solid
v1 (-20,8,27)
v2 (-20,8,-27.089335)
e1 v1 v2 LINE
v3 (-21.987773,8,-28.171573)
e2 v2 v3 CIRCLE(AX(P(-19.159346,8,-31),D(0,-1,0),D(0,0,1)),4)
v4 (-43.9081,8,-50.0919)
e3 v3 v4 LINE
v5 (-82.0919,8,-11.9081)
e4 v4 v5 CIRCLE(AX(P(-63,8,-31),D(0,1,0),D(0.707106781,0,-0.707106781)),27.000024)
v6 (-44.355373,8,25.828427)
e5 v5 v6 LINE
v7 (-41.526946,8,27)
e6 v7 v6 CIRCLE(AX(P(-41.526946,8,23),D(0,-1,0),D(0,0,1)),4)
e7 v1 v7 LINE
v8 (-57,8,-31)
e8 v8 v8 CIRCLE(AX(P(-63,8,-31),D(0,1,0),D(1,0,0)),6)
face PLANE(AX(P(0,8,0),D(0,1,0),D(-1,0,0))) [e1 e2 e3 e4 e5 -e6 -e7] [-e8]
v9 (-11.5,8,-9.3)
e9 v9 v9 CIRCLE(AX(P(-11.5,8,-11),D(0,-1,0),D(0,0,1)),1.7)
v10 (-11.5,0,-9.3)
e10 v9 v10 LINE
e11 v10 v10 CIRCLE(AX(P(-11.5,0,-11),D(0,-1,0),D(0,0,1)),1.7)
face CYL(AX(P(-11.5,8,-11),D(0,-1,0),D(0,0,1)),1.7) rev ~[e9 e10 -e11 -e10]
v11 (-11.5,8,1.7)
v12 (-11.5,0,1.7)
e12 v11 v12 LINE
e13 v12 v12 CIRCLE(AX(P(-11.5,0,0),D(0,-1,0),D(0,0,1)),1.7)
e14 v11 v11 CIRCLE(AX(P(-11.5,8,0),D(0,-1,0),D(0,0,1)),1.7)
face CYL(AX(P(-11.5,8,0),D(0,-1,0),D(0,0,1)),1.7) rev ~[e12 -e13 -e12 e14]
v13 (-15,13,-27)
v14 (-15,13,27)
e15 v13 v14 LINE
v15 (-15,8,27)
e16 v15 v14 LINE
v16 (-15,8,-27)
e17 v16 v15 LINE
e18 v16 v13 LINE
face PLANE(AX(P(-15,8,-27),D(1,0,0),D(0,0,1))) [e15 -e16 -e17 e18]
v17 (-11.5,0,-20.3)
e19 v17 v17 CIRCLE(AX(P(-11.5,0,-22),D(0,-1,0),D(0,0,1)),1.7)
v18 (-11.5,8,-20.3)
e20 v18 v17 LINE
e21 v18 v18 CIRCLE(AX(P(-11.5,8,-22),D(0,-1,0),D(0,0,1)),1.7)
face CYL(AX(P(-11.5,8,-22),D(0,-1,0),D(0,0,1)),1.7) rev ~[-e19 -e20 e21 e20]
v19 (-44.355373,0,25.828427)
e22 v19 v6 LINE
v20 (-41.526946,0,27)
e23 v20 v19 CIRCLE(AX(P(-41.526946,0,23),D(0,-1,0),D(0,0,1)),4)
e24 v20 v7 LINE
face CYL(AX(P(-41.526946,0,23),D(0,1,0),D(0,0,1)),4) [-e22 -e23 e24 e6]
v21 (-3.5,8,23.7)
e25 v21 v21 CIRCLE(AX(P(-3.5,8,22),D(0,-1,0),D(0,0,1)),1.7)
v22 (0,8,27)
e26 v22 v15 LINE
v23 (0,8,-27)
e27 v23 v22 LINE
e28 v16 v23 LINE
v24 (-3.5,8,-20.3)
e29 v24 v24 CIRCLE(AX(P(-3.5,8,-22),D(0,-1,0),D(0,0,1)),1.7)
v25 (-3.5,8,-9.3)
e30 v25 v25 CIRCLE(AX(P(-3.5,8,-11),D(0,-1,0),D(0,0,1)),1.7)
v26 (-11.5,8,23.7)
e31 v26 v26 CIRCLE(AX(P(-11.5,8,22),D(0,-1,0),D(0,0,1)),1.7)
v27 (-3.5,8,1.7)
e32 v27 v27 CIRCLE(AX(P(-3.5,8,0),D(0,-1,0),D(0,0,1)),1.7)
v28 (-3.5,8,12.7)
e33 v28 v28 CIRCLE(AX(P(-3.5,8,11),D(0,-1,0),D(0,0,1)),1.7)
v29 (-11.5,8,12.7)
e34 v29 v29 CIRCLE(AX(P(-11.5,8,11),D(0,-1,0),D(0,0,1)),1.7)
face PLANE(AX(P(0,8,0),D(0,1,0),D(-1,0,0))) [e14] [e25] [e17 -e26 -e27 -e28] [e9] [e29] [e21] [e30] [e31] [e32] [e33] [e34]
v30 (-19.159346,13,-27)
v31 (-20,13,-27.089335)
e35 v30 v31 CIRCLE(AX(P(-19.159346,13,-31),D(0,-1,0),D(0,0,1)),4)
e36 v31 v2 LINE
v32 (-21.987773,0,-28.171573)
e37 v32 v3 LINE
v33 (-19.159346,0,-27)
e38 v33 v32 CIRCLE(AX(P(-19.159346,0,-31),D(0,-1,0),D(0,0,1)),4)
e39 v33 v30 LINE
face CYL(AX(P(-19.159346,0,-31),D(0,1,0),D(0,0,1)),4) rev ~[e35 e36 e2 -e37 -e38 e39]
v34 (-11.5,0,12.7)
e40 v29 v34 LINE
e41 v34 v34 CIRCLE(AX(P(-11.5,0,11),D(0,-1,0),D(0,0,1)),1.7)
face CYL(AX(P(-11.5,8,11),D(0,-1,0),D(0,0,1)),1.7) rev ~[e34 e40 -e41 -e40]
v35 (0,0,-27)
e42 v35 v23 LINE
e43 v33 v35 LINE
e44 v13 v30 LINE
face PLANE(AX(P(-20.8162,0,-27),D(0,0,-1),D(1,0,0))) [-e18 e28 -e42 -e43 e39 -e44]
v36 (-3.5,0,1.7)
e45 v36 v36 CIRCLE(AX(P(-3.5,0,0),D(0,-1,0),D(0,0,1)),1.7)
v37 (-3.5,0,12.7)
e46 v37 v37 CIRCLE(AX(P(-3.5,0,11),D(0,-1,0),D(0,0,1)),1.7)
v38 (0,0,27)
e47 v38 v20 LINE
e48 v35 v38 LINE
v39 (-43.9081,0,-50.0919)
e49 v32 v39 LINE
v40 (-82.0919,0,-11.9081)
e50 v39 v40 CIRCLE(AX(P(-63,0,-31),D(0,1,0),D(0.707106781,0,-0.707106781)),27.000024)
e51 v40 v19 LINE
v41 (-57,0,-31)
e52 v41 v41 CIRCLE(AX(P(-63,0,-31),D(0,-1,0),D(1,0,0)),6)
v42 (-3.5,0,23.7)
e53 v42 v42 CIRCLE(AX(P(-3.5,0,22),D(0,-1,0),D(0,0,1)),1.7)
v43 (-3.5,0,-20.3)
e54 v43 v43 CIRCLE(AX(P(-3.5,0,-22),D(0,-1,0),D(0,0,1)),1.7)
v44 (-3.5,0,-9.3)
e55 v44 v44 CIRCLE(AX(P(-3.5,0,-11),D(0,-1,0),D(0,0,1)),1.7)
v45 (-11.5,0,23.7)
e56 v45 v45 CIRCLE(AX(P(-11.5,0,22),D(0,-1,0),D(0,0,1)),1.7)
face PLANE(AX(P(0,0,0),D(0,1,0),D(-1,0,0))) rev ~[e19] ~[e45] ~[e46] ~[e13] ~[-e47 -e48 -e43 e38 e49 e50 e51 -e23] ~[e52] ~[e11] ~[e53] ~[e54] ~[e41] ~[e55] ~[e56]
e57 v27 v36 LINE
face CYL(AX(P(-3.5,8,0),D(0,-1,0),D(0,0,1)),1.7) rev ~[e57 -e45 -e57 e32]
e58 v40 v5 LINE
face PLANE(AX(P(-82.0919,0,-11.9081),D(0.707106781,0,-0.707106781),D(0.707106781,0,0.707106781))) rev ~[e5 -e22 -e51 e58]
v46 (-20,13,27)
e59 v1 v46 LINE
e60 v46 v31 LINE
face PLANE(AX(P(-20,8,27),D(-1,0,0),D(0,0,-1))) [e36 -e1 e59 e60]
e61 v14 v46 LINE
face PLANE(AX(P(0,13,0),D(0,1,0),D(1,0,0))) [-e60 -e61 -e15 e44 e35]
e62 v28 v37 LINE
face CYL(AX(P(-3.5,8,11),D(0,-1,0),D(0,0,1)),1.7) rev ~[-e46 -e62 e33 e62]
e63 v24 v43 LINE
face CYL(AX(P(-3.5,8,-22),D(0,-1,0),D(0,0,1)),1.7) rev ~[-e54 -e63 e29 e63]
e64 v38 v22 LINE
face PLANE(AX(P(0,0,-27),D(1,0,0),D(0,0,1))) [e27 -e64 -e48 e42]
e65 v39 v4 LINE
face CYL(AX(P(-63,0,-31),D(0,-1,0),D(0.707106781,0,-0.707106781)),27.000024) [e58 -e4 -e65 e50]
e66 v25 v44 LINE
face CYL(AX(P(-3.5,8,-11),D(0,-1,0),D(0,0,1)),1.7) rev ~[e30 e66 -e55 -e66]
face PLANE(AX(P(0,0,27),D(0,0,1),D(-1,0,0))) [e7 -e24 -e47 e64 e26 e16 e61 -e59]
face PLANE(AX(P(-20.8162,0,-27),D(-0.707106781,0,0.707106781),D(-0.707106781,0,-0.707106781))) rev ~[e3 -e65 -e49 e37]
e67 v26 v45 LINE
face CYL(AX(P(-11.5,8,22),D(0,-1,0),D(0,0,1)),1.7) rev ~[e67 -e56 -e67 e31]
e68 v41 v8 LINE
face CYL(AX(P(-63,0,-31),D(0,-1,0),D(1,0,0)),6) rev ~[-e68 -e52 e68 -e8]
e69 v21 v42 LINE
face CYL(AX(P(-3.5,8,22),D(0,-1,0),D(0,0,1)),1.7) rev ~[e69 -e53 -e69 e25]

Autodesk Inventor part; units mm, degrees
ref_plane "YZ Plane" through (0, 0, 0) normal (1, 0, 0) x (0, 1, 0)
ref_plane "XZ Plane" through (0, 0, 0) normal (0, 1, 0) x (-1, 0, 0)
ref_plane "XY Plane" through (0, 0, 0) normal (0, 0, 1) x (1, 0, 0)
sketch "Skizze1" plane through (0, 0, 0) normal (0, 1, 0) x (-1, 0, 0)
  line L0 (20.8162, -27) -> (0, -27)
  line L1 (0, -27) -> (0, 27)
  line L2 (20.8162, -27) -> (43.9081, -50.0919)
  arc A0 (43.9081, -50.0919) -> (82.0919, -11.9081) centre (63, -31) ccw
  line L3 (82.0919, -11.9081) -> (43.1838, 27)
  line L4 (0, 27) -> (43.1838, 27)
  point P0 (0, 0)
  dimension "d0" = 54
  dimension "d40" = 135
  dimension "d42" = 54
  dimension "d43" = 31
  dimension "d47" = 63
extrude "Extrusion1" add sketch "Skizze1" along normal blind 8
sketch "Skizze3" plane through (0, 8, 0) normal (0, 1, 0) x (1, 0, 0)
  line L0 (0, 0) -> (-17.1865, 0) construction
  line L1 (0, -27) -> (0, 27) construction
  line L2 (0, -27) -> (0, 27) construction
  line L3 (0, 27) -> (-20.8162, 27) construction
  line L4 (-18, -27) -> (0, -27) construction
  line L5 (0, 27) -> (-20.8162, 27) construction
  line L6 (-20.8162, 27) -> (-43.9081, 50.0919) projected
  arc A0 (-43.9081, 50.0919) -> (-82.0919, 11.9081) centre (-63, 31) ccw projected
  line L7 (-82.0919, 11.9081) -> (-43.1838, -27) projected
  line L8 (-43.1838, -27) -> (0, -27) projected
  arc A1 (-43.9081, 50.0919) -> (-82.0919, 11.9081) centre (-63, 31) ccw projected
  circle A2 centre (-63, 31) radius 6
  point P0 (-18, 27)
  dimension "d48" = 12
extrude "Extrusion3" [suppressed]
sketch "Skizze5" plane through (0, 8, 0) normal (0, 1, 0) x (1, 0, 0)
  line L0 (0, -27) -> (0, 27) projected
  line L1 (0, 27) -> (-20.8162, 27) projected
  line L2 (-15, -27) -> (-20, -27)
  line L3 (-20, -27) -> (-20, 27)
  line L4 (-20, 27) -> (-15, 27)
  line L5 (-15, 27) -> (-15, -27)
  line L6 (-82.0919, 11.9081) -> (-43.1838, -27) projected
  line L7 (-43.1838, -27) -> (0, -27) projected
  line L8 (-20.8162, 27) -> (-43.9081, 50.0919) projected
  arc A0 (-43.9081, 50.0919) -> (-82.0919, 11.9081) centre (-63, 31) ccw projected
  point P0 (0, 0)
  dimension "d14" = 15
  dimension "d15" = 5
extrude "Extrusion4" add sketch "Skizze5" along normal blind 5 contours L2 L3 L1 L5
sketch "Skizze6" plane through (0, 8, 0) normal (0, 1, 0) x (1, 0, 0)
  line L0 (-15, 27) -> (-15, -27) projected
  line L1 (0, -27) -> (0, 27) projected
  line L2 (0, 27) -> (-15, 27) projected
  line L3 (0, 0) -> (67.4565, 0) construction
  line L4 (-15, -27) -> (0, -27) projected
  point P0 (-3.5, 0)
  dimension "d18" = 3.5
hole "Bohrung1" at (-3.5, 8, 0) direction (0, -1, 0) diameter 3.4 end through all clearance for "Inbusschraube ISO 4762" size "M3" standard "ISO"
pattern_linear "Rechteckige Anordnung1" count 5 spacing 11 along (0, 0, -1) count 2 spacing 8 along (-1, 0, 0) of "Bohrung1" first direction both ways yes
sketch "Skizze7" plane through (0, 0, 0) normal (0, -1, 0) x (1, 0, 0)
  circle A0 centre (-63, -31) radius 6
  circle A1 centre (-63, -31) radius 10 construction
  line L0 (-63, -45.6355) -> (-63, -17.0341)
  line L1 (-76.3383, -31) -> (-50.0008, -31)
  circle A2 centre (-63, -31) radius 6 projected
  point P0 (0, 0)
  point P1 (-63, -41)
  point P2 (-73, -31)
  point P3 (-63, -21)
  point P4 (-53, -31)
  dimension "d32" = 20
hole "Bohrung2" [suppressed]
fillet "Rundung1" radius 4 2 edges at (-20.8162, 4, -27) (-43.1838, 4, 27)
sketch "Skizze8" plane through (0, 8, 0) normal (0, 1, 0) x (1, 0, 0)
  arc A0 (-43.9081, 50.0919) -> (-82.0919, 11.9081) centre (-63, 31) ccw projected
  circle A1 centre (-63, 31) radius 6
  circle A2 centre (-63, 31) radius 4
  point P0 (0, 0)
  dimension "d50" = 12
  dimension "d51" = 8
extrude "Extrusion5" add sketch "Skizze8" along normal blind 3 contours A1 | A2
extrude "Extrusion6" add sketch "Skizze8" along normal blind 10 contours A2
sketch "Skizze9" plane through (0, 0, 0) normal (0, -1, 0) x (1, 0, 0)
  circle A0 centre (-63, -31) radius 4 projected
  circle A1 centre (-63, -31) radius 6 projected
  point P0 (0, 0)
extrude "Extrusion7" cut sketch "Skizze9" against normal through all contours A0 | A1
equation "\"d42\" = d0"
properties part number "dynamixel_pro_frame_part2" material "Aluminium 6061"
